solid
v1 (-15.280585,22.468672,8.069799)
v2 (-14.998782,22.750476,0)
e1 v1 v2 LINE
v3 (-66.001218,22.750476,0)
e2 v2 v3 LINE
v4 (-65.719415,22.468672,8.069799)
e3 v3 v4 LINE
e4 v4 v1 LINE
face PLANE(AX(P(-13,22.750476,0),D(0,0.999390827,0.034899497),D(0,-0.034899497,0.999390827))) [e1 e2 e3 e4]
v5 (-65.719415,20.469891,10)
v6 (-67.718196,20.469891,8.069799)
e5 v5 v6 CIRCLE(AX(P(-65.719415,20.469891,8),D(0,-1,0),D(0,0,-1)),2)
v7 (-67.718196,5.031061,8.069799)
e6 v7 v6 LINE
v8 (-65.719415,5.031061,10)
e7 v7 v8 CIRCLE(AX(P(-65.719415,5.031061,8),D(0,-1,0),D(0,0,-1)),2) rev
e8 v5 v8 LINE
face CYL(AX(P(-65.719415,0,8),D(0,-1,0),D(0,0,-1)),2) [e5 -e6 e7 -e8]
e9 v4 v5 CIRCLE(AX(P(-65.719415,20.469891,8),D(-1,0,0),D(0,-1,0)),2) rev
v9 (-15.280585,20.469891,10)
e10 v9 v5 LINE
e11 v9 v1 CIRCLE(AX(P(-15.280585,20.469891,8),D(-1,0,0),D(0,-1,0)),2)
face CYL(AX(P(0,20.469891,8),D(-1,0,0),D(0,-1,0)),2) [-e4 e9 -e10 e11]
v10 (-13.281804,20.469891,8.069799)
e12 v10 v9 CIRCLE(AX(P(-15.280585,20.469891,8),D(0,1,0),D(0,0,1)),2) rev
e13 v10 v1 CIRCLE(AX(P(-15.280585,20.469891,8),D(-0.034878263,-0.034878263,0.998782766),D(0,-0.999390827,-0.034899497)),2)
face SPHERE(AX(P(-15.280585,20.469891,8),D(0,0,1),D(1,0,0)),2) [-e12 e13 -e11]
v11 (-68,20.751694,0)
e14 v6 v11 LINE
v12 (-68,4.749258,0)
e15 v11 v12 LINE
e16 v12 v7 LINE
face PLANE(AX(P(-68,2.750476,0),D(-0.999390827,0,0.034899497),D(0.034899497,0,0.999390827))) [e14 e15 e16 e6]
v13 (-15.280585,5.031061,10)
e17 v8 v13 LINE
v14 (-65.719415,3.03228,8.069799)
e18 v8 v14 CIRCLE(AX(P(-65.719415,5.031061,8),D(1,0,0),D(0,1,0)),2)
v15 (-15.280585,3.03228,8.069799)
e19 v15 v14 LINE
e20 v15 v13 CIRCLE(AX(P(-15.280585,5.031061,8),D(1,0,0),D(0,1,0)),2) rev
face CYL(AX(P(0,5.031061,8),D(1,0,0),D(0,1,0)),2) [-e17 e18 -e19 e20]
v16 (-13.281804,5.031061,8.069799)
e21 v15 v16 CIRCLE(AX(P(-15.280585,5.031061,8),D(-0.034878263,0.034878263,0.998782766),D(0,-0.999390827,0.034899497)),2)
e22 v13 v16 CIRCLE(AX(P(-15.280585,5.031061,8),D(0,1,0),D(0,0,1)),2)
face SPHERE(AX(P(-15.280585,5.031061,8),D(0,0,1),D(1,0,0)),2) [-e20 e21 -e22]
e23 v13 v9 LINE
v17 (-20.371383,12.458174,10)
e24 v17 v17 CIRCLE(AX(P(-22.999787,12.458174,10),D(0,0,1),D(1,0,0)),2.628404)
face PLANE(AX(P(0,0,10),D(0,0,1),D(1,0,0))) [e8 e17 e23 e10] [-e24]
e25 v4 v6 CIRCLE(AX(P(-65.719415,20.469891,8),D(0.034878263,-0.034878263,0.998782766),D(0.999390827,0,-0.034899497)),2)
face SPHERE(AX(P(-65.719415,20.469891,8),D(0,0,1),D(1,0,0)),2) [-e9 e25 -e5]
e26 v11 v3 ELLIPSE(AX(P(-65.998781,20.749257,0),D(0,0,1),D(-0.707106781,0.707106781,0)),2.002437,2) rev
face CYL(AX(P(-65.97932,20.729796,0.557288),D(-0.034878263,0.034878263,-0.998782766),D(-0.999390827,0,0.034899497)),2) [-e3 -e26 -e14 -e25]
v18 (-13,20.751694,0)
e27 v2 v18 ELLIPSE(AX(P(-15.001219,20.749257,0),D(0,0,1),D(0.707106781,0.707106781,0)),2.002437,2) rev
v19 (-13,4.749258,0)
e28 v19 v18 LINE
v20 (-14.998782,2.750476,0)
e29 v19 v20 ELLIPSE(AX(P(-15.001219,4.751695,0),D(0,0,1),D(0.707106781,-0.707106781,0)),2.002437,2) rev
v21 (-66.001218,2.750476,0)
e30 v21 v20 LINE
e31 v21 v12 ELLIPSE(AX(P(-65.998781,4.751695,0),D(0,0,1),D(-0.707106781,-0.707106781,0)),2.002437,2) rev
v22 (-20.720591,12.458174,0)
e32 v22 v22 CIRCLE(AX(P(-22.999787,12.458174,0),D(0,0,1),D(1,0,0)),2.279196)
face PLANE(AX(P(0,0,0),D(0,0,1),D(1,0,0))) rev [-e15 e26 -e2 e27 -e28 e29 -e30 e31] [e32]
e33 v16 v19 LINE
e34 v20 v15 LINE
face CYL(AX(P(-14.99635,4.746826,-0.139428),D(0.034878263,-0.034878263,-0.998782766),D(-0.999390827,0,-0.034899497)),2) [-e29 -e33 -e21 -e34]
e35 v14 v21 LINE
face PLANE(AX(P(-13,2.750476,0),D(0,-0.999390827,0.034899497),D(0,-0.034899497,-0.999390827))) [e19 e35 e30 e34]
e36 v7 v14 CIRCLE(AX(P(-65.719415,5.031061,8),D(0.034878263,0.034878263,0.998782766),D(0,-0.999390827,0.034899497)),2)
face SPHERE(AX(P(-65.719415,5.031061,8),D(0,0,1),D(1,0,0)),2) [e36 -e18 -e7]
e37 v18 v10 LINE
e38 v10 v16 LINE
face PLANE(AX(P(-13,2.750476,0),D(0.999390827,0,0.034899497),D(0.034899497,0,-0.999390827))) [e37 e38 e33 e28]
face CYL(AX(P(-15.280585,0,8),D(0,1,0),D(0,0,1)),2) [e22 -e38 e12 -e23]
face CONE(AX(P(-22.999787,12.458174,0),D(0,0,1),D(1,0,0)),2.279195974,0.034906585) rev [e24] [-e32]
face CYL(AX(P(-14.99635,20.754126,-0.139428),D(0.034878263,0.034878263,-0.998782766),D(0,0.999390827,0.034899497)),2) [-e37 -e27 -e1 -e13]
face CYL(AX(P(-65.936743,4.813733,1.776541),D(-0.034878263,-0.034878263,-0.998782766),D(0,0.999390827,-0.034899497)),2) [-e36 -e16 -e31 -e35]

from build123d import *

# Parameters (mm, degrees)
SKETCH1_W           = 55
SKETCH1_H           = 20
SKETCH1_R           = 2.279195974
BOSS_EXTRUDE1_DEPTH = 10
BOSS_EXTRUDE1_DRAFT = 2
FILLET1_R           = 2
FILLET2_R           = 2


with BuildPart() as part:
    # Sketch1 → Boss-Extrude1 (with draft: the straight prism first)
    with BuildSketch(Plane.XY):
        with Locations((-40.5, 12.750475985)):
            Rectangle(SKETCH1_W, SKETCH1_H)
        with Locations((-22.9997867, 12.458174308)):
            Circle(SKETCH1_R, mode=Mode.SUBTRACT)
    extrude(amount=BOSS_EXTRUDE1_DEPTH)
    # Boss-Extrude1: the draft: its side faces are tilted about the plane it starts from
    boss_extrude1_sides = [part.faces().sort_by_distance(p)[0] for p in [
        (-13, 12.750475985, 5),
        (-40.5, 22.750475985, 5),
        (-68, 12.750475985, 5),
        (-40.5, 2.750475985, 5),
        (-25.278982673, 12.458174308, 5),
    ]]
    draft(boss_extrude1_sides, Plane.XY, BOSS_EXTRUDE1_DRAFT)

    # Fillet1
    fillet1_edges = [part.edges().sort_by_distance(p)[0] for p in [
        (-67.650792305, 12.750475985, 10),
        (-40.5, 3.09968368, 10),
        (-13.349207695, 12.750475985, 10),
        (-40.5, 22.40126829, 10),
    ]]
    fillet(fillet1_edges, radius=FILLET1_R)

    # Fillet2
    # the kernel refuses this fillet: 2 mm, written as the material it takes off along each edge
    with BuildSketch(Plane(origin=(-65.719414755, 20.469890741, 8), x_dir=(-0.719128245661317, 0.024250870657585206, -0.6944540744818377), z_dir=(-0.5638062984383352, 0.5638062984383351, 0.6035270629247093))) as fillet2_piece_1_section:
        Polygon((-4.062392326, -4.062392326), (4.062392326, -4.062392326), (4.062392326, 4.062392326), (-4.062392326, 4.062392326), align=None)
    fillet2_piece_1 = extrude(amount=4.062392326, mode=Mode.PRIVATE)
    fillet2_piece_1 = split(fillet2_piece_1, bisect_by=Plane(origin=(-65.719414755, 20.469890741, 8), z_dir=(0.03487826274237467, -0.03487826274237466, 0.9987827659587183)), keep=Keep.TOP, mode=Mode.PRIVATE)
    fillet2_piece_1 = split(fillet2_piece_1, bisect_by=Plane(origin=(-65.719414755, 20.469890741, 8), z_dir=(0, 1, 0)), keep=Keep.TOP, mode=Mode.PRIVATE)
    fillet2_piece_1 = split(fillet2_piece_1, bisect_by=Plane(origin=(-65.719414755, 20.469890741, 8), z_dir=(-1, 0, 0)), keep=Keep.TOP, mode=Mode.PRIVATE)
    fillet2_piece_1 = split(fillet2_piece_1, bisect_by=Plane(origin=(-65.719414755, 22.468672395, 8.069798993), z_dir=(0, -0.9993908270190958, -0.03489949670250102)), keep=Keep.TOP, mode=Mode.PRIVATE)
    fillet2_piece_1 = split(fillet2_piece_1, bisect_by=Plane(origin=(-67.71819641, 20.469890741, 8.069798993), z_dir=(0.9993908270190958, 0, -0.03489949670250102)), keep=Keep.TOP, mode=Mode.PRIVATE)
    fillet2_piece_1 = split(fillet2_piece_1, bisect_by=Plane(origin=(-65.719414755, 20.469890741, 10), z_dir=(0, 0, -1)), keep=Keep.TOP, mode=Mode.PRIVATE)
    fillet2_piece_1 = fillet2_piece_1 - Plane(origin=(-65.719414755, 20.469890741, 8), x_dir=(0.5638062984383352, -0.5638062984383351, -0.6035270629247093), z_dir=(-0.719128245661317, 0.024250870657585206, -0.6944540744818377)) * Sphere(FILLET2_R, mode=Mode.PRIVATE)
    add(fillet2_piece_1, mode=Mode.SUBTRACT)
    with BuildSketch(Plane(origin=(-15.280585245, 20.469890741, 8), x_dir=(0.024250870657585296, 0.719128245661317, -0.6944540744818377), z_dir=(0.5638062984383351, 0.5638062984383351, 0.6035270629247093))) as fillet2_piece_2_section:
        Polygon((-4.062392326, -4.062392326), (4.062392326, -4.062392326), (4.062392326, 4.062392326), (-4.062392326, 4.062392326), align=None)
    fillet2_piece_2 = extrude(amount=4.062392326, mode=Mode.PRIVATE)
    fillet2_piece_2 = split(fillet2_piece_2, bisect_by=Plane(origin=(-15.280585245, 20.469890741, 8), z_dir=(-0.03487826274237467, -0.034878262742374676, 0.9987827659587183)), keep=Keep.TOP, mode=Mode.PRIVATE)
    fillet2_piece_2 = split(fillet2_piece_2, bisect_by=Plane(origin=(-15.280585245, 20.469890741, 8), z_dir=(1, 0, 0)), keep=Keep.TOP, mode=Mode.PRIVATE)
    fillet2_piece_2 = split(fillet2_piece_2, bisect_by=Plane(origin=(-15.280585245, 20.469890741, 8), z_dir=(0, 1, 0)), keep=Keep.TOP, mode=Mode.PRIVATE)
    fillet2_piece_2 = split(fillet2_piece_2, bisect_by=Plane(origin=(-13.28180359, 20.469890741, 8.069798993), z_dir=(-0.9993908270190958, 0, -0.03489949670250102)), keep=Keep.TOP, mode=Mode.PRIVATE)
    fillet2_piece_2 = split(fillet2_piece_2, bisect_by=Plane(origin=(-15.280585245, 22.468672395, 8.069798993), z_dir=(0, -0.9993908270190958, -0.03489949670250102)), keep=Keep.TOP, mode=Mode.PRIVATE)
    fillet2_piece_2 = split(fillet2_piece_2, bisect_by=Plane(origin=(-15.280585245, 20.469890741, 10), z_dir=(0, 0, -1)), keep=Keep.TOP, mode=Mode.PRIVATE)
    fillet2_piece_2 = fillet2_piece_2 - Plane(origin=(-15.280585245, 20.469890741, 8), x_dir=(-0.5638062984383351, -0.5638062984383351, -0.6035270629247093), z_dir=(0.024250870657585296, 0.719128245661317, -0.6944540744818377)) * Sphere(FILLET2_R, mode=Mode.PRIVATE)
    add(fillet2_piece_2, mode=Mode.SUBTRACT)
    with BuildSketch(Plane(origin=(-65.719414755, 5.03106123, 8), x_dir=(0.7191282456613168, 0.0242508706575854, 0.6944540744818378), z_dir=(-0.5638062984383351, -0.5638062984383351, 0.6035270629247093))) as fillet2_piece_3_section:
        Polygon((-4.062392326, -4.062392326), (4.062392326, -4.062392326), (4.062392326, 4.062392326), (-4.062392326, 4.062392326), align=None)
    fillet2_piece_3 = extrude(amount=4.062392326, mode=Mode.PRIVATE)
    fillet2_piece_3 = split(fillet2_piece_3, bisect_by=Plane(origin=(-65.719414755, 5.03106123, 8), z_dir=(0.03487826274237467, 0.034878262742374676, 0.9987827659587183)), keep=Keep.TOP, mode=Mode.PRIVATE)
    fillet2_piece_3 = split(fillet2_piece_3, bisect_by=Plane(origin=(-65.719414755, 5.03106123, 8), z_dir=(0, -1, 0)), keep=Keep.TOP, mode=Mode.PRIVATE)
    fillet2_piece_3 = split(fillet2_piece_3, bisect_by=Plane(origin=(-65.719414755, 5.03106123, 8), z_dir=(-1, 0, 0)), keep=Keep.TOP, mode=Mode.PRIVATE)
    fillet2_piece_3 = split(fillet2_piece_3, bisect_by=Plane(origin=(-65.719414755, 3.032279576, 8.069798993), z_dir=(0, 0.9993908270190958, -0.03489949670250102)), keep=Keep.TOP, mode=Mode.PRIVATE)
    fillet2_piece_3 = split(fillet2_piece_3, bisect_by=Plane(origin=(-67.71819641, 5.03106123, 8.069798993), z_dir=(0.9993908270190958, 0, -0.03489949670250102)), keep=Keep.TOP, mode=Mode.PRIVATE)
    fillet2_piece_3 = split(fillet2_piece_3, bisect_by=Plane(origin=(-65.719414755, 5.03106123, 10), z_dir=(0, 0, -1)), keep=Keep.TOP, mode=Mode.PRIVATE)
    fillet2_piece_3 = fillet2_piece_3 - Plane(origin=(-65.719414755, 5.03106123, 8), x_dir=(0.5638062984383351, 0.5638062984383351, -0.6035270629247093), z_dir=(0.7191282456613168, 0.0242508706575854, 0.6944540744818378)) * Sphere(FILLET2_R, mode=Mode.PRIVATE)
    add(fillet2_piece_3, mode=Mode.SUBTRACT)
    with BuildSketch(Plane(origin=(-15.280585245, 5.03106123, 8), x_dir=(-0.024250870657585296, 0.719128245661317, 0.6944540744818377), z_dir=(0.5638062984383352, -0.5638062984383351, 0.6035270629247093))) as fillet2_piece_4_section:
        Polygon((-4.062392326, -4.062392326), (4.062392326, -4.062392326), (4.062392326, 4.062392326), (-4.062392326, 4.062392326), align=None)
    fillet2_piece_4 = extrude(amount=4.062392326, mode=Mode.PRIVATE)
    fillet2_piece_4 = split(fillet2_piece_4, bisect_by=Plane(origin=(-15.280585245, 5.03106123, 8), z_dir=(-0.03487826274237467, 0.03487826274237466, 0.9987827659587183)), keep=Keep.TOP, mode=Mode.PRIVATE)
    fillet2_piece_4 = split(fillet2_piece_4, bisect_by=Plane(origin=(-15.280585245, 5.03106123, 8), z_dir=(1, 0, 0)), keep=Keep.TOP, mode=Mode.PRIVATE)
    fillet2_piece_4 = split(fillet2_piece_4, bisect_by=Plane(origin=(-15.280585245, 5.03106123, 8), z_dir=(0, -1, 0)), keep=Keep.TOP, mode=Mode.PRIVATE)
    fillet2_piece_4 = split(fillet2_piece_4, bisect_by=Plane(origin=(-13.28180359, 5.03106123, 8.069798993), z_dir=(-0.9993908270190958, 0, -0.03489949670250102)), keep=Keep.TOP, mode=Mode.PRIVATE)
    fillet2_piece_4 = split(fillet2_piece_4, bisect_by=Plane(origin=(-15.280585245, 3.032279576, 8.069798993), z_dir=(0, 0.9993908270190958, -0.03489949670250102)), keep=Keep.TOP, mode=Mode.PRIVATE)
    fillet2_piece_4 = split(fillet2_piece_4, bisect_by=Plane(origin=(-15.280585245, 5.03106123, 10), z_dir=(0, 0, -1)), keep=Keep.TOP, mode=Mode.PRIVATE)
    fillet2_piece_4 = fillet2_piece_4 - Plane(origin=(-15.280585245, 5.03106123, 8), x_dir=(-0.5638062984383352, 0.5638062984383351, -0.6035270629247093), z_dir=(-0.024250870657585296, 0.719128245661317, 0.6944540744818377)) * Sphere(FILLET2_R, mode=Mode.PRIVATE)
    add(fillet2_piece_4, mode=Mode.SUBTRACT)
    with BuildSketch(Plane(origin=(-12.825820961, 2.576296946, -4.987835068), x_dir=(0.0012172338155652697, 0.9993915682994698, -0.034857015847091166), z_dir=(-0.03487826274237467, 0.03487826274237466, 0.9987827659587183)), Plane(origin=(-68.174179039, 2.576296946, -4.987835068), x_dir=(0.99939156829947, -0.0012172338155659363, -0.034857015847091145), z_dir=(0.03487826274237467, 0.034878262742374676, 0.9987827659587183))) as fillet2_piece_5:
        with BuildLine():
            CenterArc((FILLET2_R * 0.998782765959, FILLET2_R), FILLET2_R, 180.069784837, 89.930215163)
            Line((-FILLET2_R * 0.00121649230961, FILLET2_R * 0.99878202513), (0, 0))
            Line((0, 0), (FILLET2_R * 0.998782765959, 0))
        make_face()
    extrude(amount=13.14326166, mode=Mode.SUBTRACT)
    with BuildSketch(Plane(origin=(-68.174179039, 22.924655024, -4.987835068), x_dir=(0.99939156829947, 0.001217233815566174, -0.03485701584709114), z_dir=(0.03487826274237467, -0.03487826274237466, 0.9987827659587183)), Plane(origin=(-12.825820961, 22.924655024, -4.987835068), x_dir=(0.0012172338155670467, -0.9993915682994698, -0.03485701584709112), z_dir=(-0.03487826274237467, -0.034878262742374676, 0.9987827659587183))) as fillet2_piece_6:
        with BuildLine():
            CenterArc((FILLET2_R * 0.998782765959, -FILLET2_R), FILLET2_R, 90, 89.930215163)
            Line((-FILLET2_R * 0.00121649230961, -FILLET2_R * 0.99878202513), (0, 0))
            Line((0, 0), (FILLET2_R * 0.998782765959, 0))
        make_face()
    extrude(amount=13.14326166, mode=Mode.SUBTRACT)


solid = part.part
